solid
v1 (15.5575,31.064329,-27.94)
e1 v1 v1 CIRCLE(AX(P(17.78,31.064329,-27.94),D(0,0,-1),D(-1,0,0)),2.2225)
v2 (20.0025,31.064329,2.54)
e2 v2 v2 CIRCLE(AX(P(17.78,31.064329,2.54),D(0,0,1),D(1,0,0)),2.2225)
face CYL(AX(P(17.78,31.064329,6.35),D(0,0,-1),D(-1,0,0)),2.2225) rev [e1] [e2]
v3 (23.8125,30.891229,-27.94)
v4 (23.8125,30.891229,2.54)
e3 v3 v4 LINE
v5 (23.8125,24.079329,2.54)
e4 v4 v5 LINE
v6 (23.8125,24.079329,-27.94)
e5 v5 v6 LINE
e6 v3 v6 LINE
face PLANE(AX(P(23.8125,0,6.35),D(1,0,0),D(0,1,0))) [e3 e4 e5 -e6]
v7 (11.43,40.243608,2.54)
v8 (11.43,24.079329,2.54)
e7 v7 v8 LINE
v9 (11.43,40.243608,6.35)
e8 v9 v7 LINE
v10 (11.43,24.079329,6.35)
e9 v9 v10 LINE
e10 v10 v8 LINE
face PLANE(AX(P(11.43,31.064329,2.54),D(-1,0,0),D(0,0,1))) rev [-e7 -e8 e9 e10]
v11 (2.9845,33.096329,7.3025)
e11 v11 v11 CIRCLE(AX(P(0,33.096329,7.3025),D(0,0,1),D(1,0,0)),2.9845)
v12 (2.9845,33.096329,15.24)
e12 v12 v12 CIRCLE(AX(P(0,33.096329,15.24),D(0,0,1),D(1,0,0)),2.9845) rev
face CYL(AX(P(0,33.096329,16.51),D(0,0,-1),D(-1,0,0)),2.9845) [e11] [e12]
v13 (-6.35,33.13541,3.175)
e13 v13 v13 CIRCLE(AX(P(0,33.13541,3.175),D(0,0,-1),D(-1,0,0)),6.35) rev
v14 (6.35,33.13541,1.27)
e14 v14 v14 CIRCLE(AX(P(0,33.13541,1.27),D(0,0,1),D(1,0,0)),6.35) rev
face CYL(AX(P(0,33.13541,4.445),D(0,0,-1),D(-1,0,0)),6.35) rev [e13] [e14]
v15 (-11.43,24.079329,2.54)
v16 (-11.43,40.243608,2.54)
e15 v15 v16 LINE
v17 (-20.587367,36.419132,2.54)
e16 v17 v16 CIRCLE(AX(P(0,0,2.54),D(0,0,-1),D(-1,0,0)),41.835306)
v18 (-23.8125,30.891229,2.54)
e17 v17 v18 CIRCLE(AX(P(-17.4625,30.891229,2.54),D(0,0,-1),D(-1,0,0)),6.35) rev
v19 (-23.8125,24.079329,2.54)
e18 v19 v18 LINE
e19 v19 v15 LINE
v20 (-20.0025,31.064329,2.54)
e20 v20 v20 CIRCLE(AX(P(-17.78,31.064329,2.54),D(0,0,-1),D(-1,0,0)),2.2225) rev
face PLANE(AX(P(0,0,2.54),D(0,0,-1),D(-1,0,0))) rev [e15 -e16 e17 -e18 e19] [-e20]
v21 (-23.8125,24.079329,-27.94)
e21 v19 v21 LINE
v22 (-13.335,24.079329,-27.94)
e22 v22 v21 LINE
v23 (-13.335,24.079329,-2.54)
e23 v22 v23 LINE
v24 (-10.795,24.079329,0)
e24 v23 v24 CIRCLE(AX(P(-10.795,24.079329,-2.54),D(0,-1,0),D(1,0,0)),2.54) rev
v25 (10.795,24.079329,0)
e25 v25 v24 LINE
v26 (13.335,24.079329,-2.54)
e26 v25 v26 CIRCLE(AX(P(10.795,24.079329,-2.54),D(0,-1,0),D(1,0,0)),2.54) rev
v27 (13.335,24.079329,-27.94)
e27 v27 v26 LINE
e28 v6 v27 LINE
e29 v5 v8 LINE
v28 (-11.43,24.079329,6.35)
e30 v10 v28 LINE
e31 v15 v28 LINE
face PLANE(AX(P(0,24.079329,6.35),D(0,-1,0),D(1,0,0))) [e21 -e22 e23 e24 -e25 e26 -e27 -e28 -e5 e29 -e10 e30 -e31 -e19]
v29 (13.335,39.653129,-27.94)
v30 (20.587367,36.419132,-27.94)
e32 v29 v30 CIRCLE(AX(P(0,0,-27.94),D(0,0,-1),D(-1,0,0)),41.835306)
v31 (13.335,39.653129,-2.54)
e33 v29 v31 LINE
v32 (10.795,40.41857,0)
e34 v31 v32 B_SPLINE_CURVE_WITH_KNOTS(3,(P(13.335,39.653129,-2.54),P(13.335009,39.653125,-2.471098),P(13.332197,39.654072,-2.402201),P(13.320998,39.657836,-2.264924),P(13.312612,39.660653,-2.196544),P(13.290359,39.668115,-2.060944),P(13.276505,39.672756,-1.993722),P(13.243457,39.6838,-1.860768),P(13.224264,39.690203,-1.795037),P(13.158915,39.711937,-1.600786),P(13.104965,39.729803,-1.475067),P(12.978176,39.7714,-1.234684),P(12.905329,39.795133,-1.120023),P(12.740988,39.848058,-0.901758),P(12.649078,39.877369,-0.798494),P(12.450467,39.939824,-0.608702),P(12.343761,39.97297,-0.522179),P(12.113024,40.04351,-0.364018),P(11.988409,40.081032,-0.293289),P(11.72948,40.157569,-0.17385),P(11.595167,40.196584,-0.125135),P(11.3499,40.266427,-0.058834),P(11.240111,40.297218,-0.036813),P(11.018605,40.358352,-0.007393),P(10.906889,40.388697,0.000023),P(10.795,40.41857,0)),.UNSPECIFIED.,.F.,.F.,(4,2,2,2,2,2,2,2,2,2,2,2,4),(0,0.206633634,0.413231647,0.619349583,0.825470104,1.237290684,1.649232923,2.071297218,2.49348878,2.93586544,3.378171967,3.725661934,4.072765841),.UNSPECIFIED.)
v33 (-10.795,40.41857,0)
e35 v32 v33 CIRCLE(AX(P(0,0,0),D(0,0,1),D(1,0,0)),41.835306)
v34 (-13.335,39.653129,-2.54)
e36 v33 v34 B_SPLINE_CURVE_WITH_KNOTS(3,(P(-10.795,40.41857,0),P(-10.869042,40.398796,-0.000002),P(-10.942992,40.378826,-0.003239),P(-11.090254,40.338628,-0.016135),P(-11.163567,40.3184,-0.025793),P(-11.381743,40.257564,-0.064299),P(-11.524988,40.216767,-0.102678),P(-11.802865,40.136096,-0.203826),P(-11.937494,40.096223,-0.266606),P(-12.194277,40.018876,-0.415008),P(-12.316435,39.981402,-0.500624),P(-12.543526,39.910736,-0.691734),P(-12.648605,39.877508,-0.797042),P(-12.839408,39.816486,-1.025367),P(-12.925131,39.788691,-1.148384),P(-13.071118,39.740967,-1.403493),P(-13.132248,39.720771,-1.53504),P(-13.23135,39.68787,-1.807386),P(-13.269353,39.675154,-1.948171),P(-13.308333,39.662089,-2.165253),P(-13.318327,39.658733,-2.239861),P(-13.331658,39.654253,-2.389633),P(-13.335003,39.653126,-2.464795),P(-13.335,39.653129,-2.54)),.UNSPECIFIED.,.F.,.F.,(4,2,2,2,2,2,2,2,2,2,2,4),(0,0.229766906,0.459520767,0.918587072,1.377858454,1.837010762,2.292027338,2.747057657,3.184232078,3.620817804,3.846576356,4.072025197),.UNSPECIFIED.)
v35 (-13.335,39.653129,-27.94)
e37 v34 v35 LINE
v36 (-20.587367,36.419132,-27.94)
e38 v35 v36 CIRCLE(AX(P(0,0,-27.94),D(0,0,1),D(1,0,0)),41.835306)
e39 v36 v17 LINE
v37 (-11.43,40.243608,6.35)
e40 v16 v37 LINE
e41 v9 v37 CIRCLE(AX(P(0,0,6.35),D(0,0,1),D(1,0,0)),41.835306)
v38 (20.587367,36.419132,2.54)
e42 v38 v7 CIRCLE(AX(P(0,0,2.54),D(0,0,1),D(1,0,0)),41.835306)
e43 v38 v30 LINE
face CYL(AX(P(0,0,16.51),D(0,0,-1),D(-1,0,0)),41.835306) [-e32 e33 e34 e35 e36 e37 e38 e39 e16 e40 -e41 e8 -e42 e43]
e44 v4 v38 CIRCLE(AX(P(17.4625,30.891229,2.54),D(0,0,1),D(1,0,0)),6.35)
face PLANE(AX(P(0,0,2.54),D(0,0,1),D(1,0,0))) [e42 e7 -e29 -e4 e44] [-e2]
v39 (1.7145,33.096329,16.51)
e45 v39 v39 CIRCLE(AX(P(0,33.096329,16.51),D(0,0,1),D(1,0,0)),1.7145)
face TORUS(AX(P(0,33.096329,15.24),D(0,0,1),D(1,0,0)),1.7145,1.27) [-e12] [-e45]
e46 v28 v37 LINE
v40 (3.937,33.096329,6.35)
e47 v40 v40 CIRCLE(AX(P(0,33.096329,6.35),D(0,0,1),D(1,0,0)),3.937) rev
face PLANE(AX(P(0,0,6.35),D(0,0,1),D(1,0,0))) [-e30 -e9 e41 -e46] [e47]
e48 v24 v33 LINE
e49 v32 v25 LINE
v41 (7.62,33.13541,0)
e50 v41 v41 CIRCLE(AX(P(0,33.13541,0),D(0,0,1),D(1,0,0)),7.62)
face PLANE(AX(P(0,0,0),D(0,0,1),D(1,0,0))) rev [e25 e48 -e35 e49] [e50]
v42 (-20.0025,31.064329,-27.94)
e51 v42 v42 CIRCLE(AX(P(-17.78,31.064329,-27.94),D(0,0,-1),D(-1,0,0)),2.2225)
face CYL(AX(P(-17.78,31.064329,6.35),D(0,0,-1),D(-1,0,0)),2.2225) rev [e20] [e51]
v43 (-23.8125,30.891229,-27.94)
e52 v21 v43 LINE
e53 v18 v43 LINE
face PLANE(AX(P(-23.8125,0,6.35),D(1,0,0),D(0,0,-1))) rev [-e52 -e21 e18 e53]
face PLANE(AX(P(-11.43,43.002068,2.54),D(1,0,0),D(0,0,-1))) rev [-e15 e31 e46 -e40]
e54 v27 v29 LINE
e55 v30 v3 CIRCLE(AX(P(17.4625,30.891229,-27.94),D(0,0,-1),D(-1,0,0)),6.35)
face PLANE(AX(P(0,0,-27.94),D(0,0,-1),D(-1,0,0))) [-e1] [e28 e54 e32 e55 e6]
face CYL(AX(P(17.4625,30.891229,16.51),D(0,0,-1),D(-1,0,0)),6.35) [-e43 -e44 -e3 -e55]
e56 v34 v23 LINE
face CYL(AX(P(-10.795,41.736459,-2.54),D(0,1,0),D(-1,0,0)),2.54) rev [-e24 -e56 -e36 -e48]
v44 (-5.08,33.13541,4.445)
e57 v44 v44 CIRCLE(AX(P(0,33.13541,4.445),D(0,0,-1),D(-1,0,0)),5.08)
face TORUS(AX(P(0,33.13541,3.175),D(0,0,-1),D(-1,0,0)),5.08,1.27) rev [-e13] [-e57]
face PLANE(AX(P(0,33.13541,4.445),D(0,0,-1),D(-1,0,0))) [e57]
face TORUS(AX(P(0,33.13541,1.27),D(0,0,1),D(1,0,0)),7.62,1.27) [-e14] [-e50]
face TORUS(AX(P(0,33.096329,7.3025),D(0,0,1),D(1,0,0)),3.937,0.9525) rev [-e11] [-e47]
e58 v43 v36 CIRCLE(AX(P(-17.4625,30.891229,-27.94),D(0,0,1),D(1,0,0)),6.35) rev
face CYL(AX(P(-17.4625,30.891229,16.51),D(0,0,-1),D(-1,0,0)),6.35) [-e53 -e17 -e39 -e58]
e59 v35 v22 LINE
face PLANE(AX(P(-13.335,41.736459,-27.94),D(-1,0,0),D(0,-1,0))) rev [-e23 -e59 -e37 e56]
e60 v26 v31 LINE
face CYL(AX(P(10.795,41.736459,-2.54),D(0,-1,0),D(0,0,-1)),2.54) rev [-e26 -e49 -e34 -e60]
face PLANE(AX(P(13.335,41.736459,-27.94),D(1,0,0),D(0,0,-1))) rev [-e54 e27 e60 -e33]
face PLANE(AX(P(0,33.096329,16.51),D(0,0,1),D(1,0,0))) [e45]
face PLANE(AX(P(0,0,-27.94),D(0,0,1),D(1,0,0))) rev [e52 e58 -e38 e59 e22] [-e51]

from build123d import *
from build123d.topology import SkipClean

# Parameters (mm, degrees)
SKETCH1_R               = 2.2225
BOSS_EXTRUDE1_DEPTH     = 6.35
SKETCH2_R               = 2.9845
BOSS_EXTRUDE2_DEPTH     = 10.16
FILLET1_R               = 1.27
FILLET2_R               = 0.9525
SKETCH3_R               = 6.35
CUT_EXTRUDE1_DEPTH      = 4.445
FILLET3_R               = 1.27
CUT_EXTRUDE3_DEPTH      = 3.81
BOSS_EXTRUDE3_START     = 27.94
SKETCH5_R               = 2.2225
BOSS_EXTRUDE3_DEPTH     = 27.94
FILLET4_R               = 2.54
CUT_EXTRUDE4_DEPTH      = 67.802633891
CUT_EXTRUDE4_DEPTH_BACK = 67.802633891
SKETCH6_R               = 48.008208045
SKETCH6_R_2             = 41.83530628
FILLET5_R               = 6.35


with BuildPart() as part:
    # Sketch1 → Boss-Extrude1 (new body)
    # profile 1 of 2: a face of its own
    with BuildSketch(Plane.XY):
        with BuildLine():
            ThreePointArc((0, 43.815), (-12.415069648, 42.019284509), (-23.8125, 36.779329368))
            Line((-23.8125, 36.779329368), (-23.8125, 24.079329368))
            Line((-23.8125, 24.079329368), (0, 24.079329368))
            Line((0, 24.079329368), (0, 43.815))
        make_face()
        with Locations((-17.78, 31.064329368)):
            Circle(SKETCH1_R, mode=Mode.SUBTRACT)
    # profile 2 of 2: a face of its own
    with BuildSketch(Plane.XY):
        with BuildLine():
            ThreePointArc((23.8125, 36.779329368), (12.415069648, 42.019284509), (0, 43.815))
            Line((0, 43.815), (0, 24.079329368))
            Line((0, 24.079329368), (23.8125, 24.079329368))
            Line((23.8125, 24.079329368), (23.8125, 36.779329368))
        make_face()
        with Locations((17.78, 31.064329368)):
            Circle(SKETCH1_R, mode=Mode.SUBTRACT)
    extrude(amount=BOSS_EXTRUDE1_DEPTH)

    # Sketch2 → Boss-Extrude2 (add)
    with BuildSketch(Plane.XY.offset(6.35)):
        with Locations((0, 33.096329368)):
            Circle(SKETCH2_R)
    extrude(amount=BOSS_EXTRUDE2_DEPTH)

    # Fillet1
    fillet1_edges = [part.edges().sort_by_distance(p)[0] for p in [
        (-2.9845, 33.096329368, 16.51),
    ]]
    fillet(fillet1_edges, radius=FILLET1_R)

    # Fillet2
    fillet2_edges = [part.edges().sort_by_distance(p)[0] for p in [
        (-2.9845, 33.096329368, 6.35),
    ]]
    fillet(fillet2_edges, radius=FILLET2_R)

    # Sketch3 → Cut-Extrude1 (cut)
    with BuildSketch(Plane(origin=(0, 0, 0), x_dir=(-1, 0, 0), z_dir=(0, 0, -1))):
        with Locations((0, 33.13540962)):
            Circle(SKETCH3_R)
    extrude(amount=-CUT_EXTRUDE1_DEPTH, mode=Mode.SUBTRACT)

    # Fillet3
    fillet3_edges = [part.edges().sort_by_distance(p)[0] for p in [
        (6.35, 33.13540962, 4.445),
        (6.35, 33.13540962, 0),
    ]]
    fillet(fillet3_edges, radius=FILLET3_R)

    # Sketch4 → Cut-Extrude3 (cut)
    with BuildSketch(Plane.XY.offset(6.35)):
        Polygon((-11.43, 43.00206802), (-28.337535583, 46.175596046), (-28.8894535, 24.714329368), (-14.712061992, 19.166112953), (-11.43, 21.94022116), align=None)
        Polygon((28.8894535, 24.714329368), (14.712061992, 19.166112953), (11.43, 21.94022116), (11.43, 31.064329368), (11.43, 43.00206802), (28.337535583, 46.175596046), align=None)
    extrude(amount=-CUT_EXTRUDE3_DEPTH, mode=Mode.SUBTRACT)

    # Sketch5 → Boss-Extrude3 (add)
    # profile 1 of 2: a face of its own
    with SkipClean():  # the faces are left unmerged after this step: merging them gives an invalid solid
        with BuildSketch(Plane(origin=(0, 0, 0), x_dir=(-1, 0, 0), z_dir=(0, 0, -1)).offset(BOSS_EXTRUDE3_START)):
            with BuildLine():
                Line((-13.335, 41.736458882), (-13.335, 24.079329368))
                Line((-13.335, 24.079329368), (-23.8125, 24.079329368))
                Line((-23.8125, 24.079329368), (-23.8125, 36.779329368))
                ThreePointArc((-23.8125, 36.779329368), (-18.738395671, 39.605892903), (-13.335, 41.736458882))
            make_face()
            with Locations((-17.78, 31.064329368)):
                Circle(SKETCH5_R, mode=Mode.SUBTRACT)
        # profile 2 of 2: a face of its own
        with BuildSketch(Plane(origin=(0, 0, 0), x_dir=(-1, 0, 0), z_dir=(0, 0, -1)).offset(BOSS_EXTRUDE3_START)):
            with BuildLine():
                Line((23.8125, 36.779329368), (23.8125, 24.079329368))
                Line((23.8125, 24.079329368), (13.335, 24.079329368))
                Line((13.335, 24.079329368), (13.335, 41.736458882))
                ThreePointArc((13.335, 41.736458882), (18.738395671, 39.605892903), (23.8125, 36.779329368))
            make_face()
            with Locations((17.78, 31.064329368)):
                Circle(SKETCH5_R, mode=Mode.SUBTRACT)
        extrude(amount=-BOSS_EXTRUDE3_DEPTH)

    # Fillet4
    # the kernel refuses this fillet: 2.54 mm, written as the material it adds along each edge
    with BuildSketch(Plane(origin=(13.335, 48.086458882, 0), x_dir=(-1, 0, 0), z_dir=(0, -1, 0))) as fillet4_piece_1_section:
        with BuildLine():
            CenterArc((FILLET4_R, FILLET4_R), FILLET4_R, 180, 90)
            Line((0, FILLET4_R), (0, 0))
            Line((0, 0), (FILLET4_R, 0))
        make_face()
    fillet4_piece_1 = extrude(amount=24.007129514, mode=Mode.PRIVATE)
    fillet4_piece_1 = fillet4_piece_1 & Plane(origin=(0, 0, -0.572064254), x_dir=(0, 1, 0), z_dir=(0, 0, -1)) * Cylinder(43.815, 59, mode=Mode.PRIVATE)
    add(fillet4_piece_1)
    with BuildSketch(Plane(origin=(-13.335, 24.079329368, 0), x_dir=(1, 0, 0), z_dir=(0, 1, 0))) as fillet4_piece_2_section:
        with BuildLine():
            CenterArc((FILLET4_R, FILLET4_R), FILLET4_R, 180, 90)
            Line((0, FILLET4_R), (0, 0))
            Line((0, 0), (FILLET4_R, 0))
        make_face()
    fillet4_piece_2 = extrude(amount=24.007129514, mode=Mode.PRIVATE)
    fillet4_piece_2 = fillet4_piece_2 & Plane(origin=(0, 0, -0.572062471), x_dir=(0, 1, 0), z_dir=(0, 0, -1)) * Cylinder(43.815, 59, mode=Mode.PRIVATE)
    add(fillet4_piece_2)

    # Sketch6 → Cut-Extrude4 (cut, two sides: drawn at the far end of the back side and taken through both)
    with BuildSketch(Plane(origin=(0, 0, -27.94), x_dir=(-1, 0, 0), z_dir=(0, 0, -1)).offset(-CUT_EXTRUDE4_DEPTH_BACK)):
        Circle(SKETCH6_R)
        Circle(SKETCH6_R_2, mode=Mode.SUBTRACT)
    extrude(amount=CUT_EXTRUDE4_DEPTH + CUT_EXTRUDE4_DEPTH_BACK, mode=Mode.SUBTRACT)

    # Fillet5
    fillet5_edges = [part.edges().sort_by_distance(p)[0] for p in [
        (23.8125, 34.397059399, -12.7),
        (-23.8125, 34.397059399, -12.7),
    ]]
    fillet(fillet5_edges, radius=FILLET5_R)


solid = part.part
